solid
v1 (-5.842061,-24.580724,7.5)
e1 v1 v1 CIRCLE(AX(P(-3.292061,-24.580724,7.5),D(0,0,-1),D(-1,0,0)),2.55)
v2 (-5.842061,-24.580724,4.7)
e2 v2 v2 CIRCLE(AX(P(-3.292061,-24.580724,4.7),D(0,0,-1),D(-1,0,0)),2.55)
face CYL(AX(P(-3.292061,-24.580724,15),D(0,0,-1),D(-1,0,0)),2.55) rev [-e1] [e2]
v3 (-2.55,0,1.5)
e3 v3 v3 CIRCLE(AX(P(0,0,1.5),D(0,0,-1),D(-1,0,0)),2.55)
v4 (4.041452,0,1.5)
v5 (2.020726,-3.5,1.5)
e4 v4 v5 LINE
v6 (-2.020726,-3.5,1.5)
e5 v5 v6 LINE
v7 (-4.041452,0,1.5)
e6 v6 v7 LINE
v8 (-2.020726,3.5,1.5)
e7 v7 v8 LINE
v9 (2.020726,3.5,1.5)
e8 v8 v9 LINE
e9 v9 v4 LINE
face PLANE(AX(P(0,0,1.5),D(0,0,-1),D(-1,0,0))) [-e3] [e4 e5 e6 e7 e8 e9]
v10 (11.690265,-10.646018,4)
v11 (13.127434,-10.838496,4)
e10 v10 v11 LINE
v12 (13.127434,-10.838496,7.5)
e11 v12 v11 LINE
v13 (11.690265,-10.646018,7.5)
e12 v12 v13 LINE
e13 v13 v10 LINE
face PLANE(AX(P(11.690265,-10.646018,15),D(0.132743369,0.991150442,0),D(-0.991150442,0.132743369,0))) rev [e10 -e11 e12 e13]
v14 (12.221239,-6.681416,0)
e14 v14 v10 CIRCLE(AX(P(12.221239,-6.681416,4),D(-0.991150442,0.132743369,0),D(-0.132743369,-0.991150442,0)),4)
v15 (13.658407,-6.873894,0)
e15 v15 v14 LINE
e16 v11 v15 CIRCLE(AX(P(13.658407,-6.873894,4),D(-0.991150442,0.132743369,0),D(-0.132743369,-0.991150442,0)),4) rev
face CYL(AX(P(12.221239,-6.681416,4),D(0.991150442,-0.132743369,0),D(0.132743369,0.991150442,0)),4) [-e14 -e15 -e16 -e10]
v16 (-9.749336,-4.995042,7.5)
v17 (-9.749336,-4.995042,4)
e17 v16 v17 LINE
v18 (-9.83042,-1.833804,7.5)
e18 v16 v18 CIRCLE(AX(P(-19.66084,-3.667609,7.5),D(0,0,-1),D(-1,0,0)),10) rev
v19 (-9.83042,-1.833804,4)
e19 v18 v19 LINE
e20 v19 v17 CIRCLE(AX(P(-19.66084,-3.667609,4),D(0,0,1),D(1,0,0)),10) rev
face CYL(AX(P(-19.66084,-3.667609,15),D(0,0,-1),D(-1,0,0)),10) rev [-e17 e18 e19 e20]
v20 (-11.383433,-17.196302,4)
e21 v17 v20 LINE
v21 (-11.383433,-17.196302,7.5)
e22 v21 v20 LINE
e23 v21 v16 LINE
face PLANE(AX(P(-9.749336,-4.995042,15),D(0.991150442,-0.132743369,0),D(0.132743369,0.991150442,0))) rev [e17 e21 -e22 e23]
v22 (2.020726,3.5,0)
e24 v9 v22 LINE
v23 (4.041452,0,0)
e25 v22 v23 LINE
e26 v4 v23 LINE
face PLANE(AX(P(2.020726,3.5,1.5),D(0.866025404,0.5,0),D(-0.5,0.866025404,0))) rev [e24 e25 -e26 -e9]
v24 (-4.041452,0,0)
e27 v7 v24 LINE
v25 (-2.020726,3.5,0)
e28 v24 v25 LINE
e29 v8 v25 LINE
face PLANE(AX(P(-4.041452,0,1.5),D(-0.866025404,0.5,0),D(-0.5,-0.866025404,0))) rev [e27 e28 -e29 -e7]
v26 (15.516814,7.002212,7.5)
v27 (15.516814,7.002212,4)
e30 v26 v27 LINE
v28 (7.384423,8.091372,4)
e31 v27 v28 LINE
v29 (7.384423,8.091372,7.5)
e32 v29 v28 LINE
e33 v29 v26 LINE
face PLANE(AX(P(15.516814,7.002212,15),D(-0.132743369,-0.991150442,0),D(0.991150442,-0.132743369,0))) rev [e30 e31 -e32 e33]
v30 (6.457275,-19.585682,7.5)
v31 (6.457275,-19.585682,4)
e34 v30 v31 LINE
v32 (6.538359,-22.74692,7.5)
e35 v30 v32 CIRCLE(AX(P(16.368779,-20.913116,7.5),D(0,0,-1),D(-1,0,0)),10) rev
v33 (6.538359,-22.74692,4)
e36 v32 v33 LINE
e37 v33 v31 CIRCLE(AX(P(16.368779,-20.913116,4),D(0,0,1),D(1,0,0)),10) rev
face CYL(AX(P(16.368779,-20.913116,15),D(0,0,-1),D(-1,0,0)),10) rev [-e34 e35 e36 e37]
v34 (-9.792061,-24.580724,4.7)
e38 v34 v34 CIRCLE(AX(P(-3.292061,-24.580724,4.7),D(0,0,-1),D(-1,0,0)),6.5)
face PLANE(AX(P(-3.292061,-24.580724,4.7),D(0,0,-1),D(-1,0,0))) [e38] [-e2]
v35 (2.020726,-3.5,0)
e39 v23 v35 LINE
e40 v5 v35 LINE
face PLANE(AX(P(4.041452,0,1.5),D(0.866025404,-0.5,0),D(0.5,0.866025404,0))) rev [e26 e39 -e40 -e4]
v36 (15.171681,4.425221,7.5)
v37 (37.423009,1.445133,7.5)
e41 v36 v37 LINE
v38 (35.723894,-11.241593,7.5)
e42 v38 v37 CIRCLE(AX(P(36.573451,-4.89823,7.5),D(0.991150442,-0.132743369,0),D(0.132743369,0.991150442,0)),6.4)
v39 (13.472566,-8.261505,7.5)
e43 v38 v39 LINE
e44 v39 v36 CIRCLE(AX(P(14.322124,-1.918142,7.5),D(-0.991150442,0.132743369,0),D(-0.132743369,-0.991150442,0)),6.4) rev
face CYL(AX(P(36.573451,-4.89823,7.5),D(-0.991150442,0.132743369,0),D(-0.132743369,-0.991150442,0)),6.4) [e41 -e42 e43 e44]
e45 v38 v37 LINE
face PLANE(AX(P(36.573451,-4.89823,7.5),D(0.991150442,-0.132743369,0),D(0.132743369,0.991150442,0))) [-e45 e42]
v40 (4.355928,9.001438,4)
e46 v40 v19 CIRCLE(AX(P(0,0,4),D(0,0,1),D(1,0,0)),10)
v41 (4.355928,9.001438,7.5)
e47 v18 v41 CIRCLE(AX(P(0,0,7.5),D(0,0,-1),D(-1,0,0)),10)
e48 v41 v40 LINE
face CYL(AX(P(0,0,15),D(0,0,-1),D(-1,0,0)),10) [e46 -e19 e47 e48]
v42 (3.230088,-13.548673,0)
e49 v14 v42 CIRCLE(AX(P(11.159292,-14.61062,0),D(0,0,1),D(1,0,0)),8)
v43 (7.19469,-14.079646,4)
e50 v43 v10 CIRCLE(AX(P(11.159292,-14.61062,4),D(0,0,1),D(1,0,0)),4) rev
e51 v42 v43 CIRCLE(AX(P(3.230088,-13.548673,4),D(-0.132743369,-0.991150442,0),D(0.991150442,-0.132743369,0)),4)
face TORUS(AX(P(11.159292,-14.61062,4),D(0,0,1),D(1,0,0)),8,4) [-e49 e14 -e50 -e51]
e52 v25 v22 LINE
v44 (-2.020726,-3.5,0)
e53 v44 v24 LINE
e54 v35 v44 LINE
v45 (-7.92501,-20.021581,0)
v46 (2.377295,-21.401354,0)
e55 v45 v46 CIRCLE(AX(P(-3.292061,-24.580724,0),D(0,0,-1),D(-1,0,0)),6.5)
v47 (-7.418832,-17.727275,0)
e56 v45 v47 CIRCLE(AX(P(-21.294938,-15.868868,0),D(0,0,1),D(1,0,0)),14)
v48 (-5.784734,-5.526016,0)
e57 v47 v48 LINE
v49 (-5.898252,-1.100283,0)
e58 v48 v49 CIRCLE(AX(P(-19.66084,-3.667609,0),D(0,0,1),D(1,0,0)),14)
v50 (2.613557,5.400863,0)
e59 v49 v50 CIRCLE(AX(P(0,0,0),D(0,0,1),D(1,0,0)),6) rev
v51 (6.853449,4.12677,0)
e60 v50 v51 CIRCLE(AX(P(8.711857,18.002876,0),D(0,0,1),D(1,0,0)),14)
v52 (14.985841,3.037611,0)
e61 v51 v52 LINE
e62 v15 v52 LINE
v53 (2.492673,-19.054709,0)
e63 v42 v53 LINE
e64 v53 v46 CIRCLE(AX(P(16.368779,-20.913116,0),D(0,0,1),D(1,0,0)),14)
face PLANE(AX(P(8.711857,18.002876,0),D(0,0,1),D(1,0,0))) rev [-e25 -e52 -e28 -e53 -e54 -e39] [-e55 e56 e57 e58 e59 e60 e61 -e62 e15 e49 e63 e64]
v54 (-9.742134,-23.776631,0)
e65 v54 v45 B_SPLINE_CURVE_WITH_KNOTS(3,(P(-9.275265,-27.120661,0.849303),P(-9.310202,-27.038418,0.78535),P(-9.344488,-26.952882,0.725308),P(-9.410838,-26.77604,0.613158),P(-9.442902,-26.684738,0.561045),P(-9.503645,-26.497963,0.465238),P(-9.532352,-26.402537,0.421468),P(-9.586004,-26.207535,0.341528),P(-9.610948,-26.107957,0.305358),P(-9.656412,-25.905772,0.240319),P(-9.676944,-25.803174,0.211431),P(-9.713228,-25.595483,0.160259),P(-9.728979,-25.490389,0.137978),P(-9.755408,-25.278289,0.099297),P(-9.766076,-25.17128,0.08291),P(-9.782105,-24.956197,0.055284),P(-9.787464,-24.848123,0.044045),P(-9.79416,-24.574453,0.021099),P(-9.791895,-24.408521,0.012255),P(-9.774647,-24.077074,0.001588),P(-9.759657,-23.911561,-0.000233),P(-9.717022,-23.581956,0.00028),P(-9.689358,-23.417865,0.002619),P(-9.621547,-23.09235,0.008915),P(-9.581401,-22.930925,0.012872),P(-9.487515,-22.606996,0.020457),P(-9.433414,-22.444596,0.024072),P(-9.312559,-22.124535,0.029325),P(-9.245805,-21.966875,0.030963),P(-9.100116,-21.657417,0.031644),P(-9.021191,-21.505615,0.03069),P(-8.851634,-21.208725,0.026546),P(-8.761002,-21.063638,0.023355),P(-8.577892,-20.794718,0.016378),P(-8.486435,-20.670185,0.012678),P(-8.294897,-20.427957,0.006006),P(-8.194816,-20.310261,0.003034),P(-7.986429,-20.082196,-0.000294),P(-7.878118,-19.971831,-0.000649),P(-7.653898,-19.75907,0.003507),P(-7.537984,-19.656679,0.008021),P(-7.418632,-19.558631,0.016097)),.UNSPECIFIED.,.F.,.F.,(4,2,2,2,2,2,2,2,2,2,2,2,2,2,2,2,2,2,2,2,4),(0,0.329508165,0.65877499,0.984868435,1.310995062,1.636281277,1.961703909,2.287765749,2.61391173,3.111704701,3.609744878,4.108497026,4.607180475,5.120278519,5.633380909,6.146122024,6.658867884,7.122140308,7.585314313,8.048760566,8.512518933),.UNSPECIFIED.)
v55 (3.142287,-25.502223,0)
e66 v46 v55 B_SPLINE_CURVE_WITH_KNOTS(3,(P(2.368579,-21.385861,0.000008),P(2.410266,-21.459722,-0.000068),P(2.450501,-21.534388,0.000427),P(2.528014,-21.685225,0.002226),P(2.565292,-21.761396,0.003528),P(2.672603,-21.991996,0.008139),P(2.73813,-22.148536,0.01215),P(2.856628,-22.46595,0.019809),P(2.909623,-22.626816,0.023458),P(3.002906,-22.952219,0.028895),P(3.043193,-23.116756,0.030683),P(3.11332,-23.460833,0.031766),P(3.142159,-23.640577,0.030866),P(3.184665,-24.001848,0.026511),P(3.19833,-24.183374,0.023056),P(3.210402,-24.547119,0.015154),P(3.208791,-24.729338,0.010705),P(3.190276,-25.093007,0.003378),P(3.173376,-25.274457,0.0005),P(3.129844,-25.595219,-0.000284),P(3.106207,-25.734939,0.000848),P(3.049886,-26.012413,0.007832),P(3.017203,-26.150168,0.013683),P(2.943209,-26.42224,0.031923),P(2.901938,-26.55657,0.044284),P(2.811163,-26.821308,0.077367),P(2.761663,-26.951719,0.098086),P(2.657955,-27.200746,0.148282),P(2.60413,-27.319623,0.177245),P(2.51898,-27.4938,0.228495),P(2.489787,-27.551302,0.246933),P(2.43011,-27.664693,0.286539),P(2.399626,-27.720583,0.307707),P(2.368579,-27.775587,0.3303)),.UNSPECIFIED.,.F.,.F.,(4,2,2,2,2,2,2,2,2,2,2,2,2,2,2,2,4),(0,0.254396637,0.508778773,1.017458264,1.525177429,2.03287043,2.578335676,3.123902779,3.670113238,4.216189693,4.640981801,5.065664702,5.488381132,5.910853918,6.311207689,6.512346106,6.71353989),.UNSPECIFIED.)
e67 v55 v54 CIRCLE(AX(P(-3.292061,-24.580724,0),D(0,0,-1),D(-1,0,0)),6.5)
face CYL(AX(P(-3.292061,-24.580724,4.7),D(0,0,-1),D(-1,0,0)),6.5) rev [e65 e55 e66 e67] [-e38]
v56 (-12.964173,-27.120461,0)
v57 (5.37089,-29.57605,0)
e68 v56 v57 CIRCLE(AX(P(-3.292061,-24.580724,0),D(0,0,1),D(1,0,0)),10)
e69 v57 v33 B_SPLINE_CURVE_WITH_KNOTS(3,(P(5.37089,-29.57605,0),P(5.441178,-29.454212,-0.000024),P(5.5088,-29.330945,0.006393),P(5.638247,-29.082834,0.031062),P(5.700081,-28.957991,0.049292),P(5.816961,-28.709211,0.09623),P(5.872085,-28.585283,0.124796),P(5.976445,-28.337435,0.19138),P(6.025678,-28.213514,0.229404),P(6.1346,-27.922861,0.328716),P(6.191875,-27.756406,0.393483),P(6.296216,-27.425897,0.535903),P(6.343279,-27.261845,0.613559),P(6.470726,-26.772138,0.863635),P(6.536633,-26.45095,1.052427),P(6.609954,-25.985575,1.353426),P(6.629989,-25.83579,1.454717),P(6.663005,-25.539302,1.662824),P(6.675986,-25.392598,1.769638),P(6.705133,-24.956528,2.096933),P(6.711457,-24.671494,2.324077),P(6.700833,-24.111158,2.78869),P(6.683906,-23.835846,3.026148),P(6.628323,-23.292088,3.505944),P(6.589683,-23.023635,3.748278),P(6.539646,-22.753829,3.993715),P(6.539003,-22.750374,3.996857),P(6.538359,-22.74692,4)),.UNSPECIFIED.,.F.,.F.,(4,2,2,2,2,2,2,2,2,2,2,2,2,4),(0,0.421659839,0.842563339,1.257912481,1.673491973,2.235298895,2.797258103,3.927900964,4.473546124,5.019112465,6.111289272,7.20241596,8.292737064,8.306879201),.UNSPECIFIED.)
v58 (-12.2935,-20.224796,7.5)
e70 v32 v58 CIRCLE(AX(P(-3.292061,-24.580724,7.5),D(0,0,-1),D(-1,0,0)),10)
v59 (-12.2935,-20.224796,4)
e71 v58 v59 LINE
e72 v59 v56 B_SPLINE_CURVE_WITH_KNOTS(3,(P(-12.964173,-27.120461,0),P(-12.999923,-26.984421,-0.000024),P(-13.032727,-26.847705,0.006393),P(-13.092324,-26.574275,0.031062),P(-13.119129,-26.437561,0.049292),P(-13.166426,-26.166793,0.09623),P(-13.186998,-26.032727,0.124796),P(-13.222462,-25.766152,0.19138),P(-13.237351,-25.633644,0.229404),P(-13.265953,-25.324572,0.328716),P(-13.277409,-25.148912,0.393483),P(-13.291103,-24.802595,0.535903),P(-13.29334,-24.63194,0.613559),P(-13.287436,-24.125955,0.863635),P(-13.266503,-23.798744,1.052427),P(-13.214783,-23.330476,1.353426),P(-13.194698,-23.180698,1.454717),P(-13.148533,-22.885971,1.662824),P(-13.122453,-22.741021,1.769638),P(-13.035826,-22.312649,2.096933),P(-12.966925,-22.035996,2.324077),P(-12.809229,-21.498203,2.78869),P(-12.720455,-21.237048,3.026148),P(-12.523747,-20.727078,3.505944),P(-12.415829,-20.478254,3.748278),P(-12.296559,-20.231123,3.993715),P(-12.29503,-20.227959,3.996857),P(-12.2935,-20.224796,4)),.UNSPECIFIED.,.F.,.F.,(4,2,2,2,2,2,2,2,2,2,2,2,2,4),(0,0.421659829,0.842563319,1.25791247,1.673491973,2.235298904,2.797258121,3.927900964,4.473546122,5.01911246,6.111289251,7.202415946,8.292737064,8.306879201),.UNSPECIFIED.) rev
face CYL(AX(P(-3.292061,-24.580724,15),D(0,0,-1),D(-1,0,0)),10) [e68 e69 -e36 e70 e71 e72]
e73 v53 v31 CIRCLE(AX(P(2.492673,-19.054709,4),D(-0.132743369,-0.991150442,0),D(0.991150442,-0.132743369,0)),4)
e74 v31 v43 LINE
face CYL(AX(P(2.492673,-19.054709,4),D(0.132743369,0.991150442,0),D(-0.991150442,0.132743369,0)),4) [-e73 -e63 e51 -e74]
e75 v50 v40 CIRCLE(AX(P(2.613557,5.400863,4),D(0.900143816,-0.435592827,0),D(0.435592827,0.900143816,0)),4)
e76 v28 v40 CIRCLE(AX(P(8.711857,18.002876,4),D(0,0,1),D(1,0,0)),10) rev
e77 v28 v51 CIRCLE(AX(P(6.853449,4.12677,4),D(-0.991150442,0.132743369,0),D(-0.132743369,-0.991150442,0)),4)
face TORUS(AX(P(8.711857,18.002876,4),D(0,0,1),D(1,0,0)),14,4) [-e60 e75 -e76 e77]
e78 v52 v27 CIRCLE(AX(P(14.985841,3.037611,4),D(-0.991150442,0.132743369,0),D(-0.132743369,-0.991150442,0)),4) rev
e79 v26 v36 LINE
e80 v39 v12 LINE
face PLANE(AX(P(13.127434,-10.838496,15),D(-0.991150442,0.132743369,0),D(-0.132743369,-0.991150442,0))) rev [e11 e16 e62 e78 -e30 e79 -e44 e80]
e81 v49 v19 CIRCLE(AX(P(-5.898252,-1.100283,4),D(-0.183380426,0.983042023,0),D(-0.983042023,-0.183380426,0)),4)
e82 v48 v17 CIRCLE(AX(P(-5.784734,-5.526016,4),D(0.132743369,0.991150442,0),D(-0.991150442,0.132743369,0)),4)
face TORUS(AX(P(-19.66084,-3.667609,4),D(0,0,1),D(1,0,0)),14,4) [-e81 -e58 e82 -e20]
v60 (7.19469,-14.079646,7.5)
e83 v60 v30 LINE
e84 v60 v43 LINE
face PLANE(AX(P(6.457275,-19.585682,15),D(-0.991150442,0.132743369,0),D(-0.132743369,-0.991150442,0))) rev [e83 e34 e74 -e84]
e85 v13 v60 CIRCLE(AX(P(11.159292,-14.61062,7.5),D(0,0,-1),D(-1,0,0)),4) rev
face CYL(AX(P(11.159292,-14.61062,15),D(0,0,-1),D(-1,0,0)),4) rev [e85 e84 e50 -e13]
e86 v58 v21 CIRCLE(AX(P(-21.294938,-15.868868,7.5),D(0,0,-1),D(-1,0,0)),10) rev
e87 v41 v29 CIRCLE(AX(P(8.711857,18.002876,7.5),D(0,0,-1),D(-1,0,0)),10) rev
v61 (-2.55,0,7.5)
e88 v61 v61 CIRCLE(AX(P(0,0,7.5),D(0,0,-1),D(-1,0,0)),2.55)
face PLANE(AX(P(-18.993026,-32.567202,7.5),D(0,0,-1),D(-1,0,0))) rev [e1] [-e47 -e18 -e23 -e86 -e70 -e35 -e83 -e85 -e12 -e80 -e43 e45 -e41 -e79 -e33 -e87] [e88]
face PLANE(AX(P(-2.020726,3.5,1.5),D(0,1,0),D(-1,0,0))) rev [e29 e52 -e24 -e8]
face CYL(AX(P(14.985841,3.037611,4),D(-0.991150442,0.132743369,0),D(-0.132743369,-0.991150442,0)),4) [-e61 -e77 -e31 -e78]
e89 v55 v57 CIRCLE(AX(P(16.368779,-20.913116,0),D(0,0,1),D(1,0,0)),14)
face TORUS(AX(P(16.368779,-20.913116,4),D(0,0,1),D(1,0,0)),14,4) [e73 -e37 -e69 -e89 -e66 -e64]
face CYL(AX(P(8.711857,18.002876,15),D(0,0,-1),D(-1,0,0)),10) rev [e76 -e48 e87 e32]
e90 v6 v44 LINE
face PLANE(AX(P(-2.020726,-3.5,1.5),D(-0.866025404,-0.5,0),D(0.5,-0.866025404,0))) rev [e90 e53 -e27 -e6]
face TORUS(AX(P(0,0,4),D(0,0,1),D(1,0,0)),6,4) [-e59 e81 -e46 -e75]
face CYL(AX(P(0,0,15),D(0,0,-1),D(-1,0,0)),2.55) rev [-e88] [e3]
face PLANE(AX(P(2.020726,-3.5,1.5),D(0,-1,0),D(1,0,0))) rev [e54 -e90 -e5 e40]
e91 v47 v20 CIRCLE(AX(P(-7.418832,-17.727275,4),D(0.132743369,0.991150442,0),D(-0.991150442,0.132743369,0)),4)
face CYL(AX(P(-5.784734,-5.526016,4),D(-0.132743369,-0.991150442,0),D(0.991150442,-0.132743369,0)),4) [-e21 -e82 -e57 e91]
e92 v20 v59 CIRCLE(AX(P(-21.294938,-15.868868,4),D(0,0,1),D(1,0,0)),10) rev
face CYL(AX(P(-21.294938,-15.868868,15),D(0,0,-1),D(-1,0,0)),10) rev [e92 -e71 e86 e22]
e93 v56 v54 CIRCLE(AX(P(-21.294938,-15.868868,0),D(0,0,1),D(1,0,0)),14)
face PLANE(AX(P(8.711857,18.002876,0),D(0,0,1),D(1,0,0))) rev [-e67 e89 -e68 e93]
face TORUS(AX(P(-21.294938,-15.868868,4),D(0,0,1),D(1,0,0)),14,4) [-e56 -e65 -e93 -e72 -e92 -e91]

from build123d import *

# Parameters (mm, degrees)
SKETCH_5_R          = 2.549999999999386
SKETCH_5_R_2        = 2.5499999999993856
EXTRUDE_3_DEPTH     = 15
FILLET_4_R          = 4
SKETCH_6_R          = 6.4
EXTRUDE_4_DEPTH     = 22.45
SKETCH_7_R          = 6.500000000000399
CUT_EXTRUDE_1_DEPTH = 4.7
CUT_EXTRUDE_START   = -4.7
SKETCH_8_R          = 6.5000000000004
CUT_EXTRUDE_2_DEPTH = 4.7
SKETCH_9_W          = 7.500000000000001
SKETCH_9_H          = 50
CUT_EXTRUDE_3_DEPTH = 60.93846709540564
CUT_EXTRUDE_4_DEPTH = 1.5


with BuildPart() as part:
    # 草图5 → 凸台-拉伸3 (new body)
    with BuildSketch(Plane.XY):
        with BuildLine():
            Line((15.516814200942974, 7.002212297082977), (7.384422843001557, 8.091371903180063))
            ThreePointArc((7.384422843001557, 8.091371903180063), (5.833974336981676, 8.425935572547054), (4.355928265143314, 9.001438160032777))
            ThreePointArc((4.355928265143314, 9.001438160032777), (-6.069854623087594, 7.9471293467862205), (-9.830420232039064, -1.833804259316535))
            ThreePointArc((-9.830420232039064, -1.833804259316535), (-9.664128327097558, -3.411197812311804), (-9.749336047196284, -4.9950422059047135))
            Line((-9.749336047196284, -4.9950422059047135), (-11.383433357070604, -17.19630156804213))
            ThreePointArc((-11.383433357070604, -17.19630156804213), (-11.717997026437386, -18.74675007406113), (-12.293499613922735, -20.224796145898665))
            ThreePointArc((-12.293499613922735, -20.224796145898665), (-4.619495141172904, -34.49222882793015), (6.538358778190678, -22.74692015173956))
            ThreePointArc((6.538358778190678, -22.74692015173956), (6.372066873248224, -21.169526598736233), (6.457274593312704, -19.585682205136127))
            Line((6.457274593312704, -19.585682205136127), (7.194690181736359, -14.079646060494996))
            ThreePointArc((7.194690181736359, -14.079646060494996), (8.731350099253188, -11.431767796690654), (11.6902654233994, -10.646017768651808))
            Line((11.6902654233994, -10.646017768651808), (13.127433563848712, -10.83849565330608))
            Line((13.127433563848712, -10.83849565330608), (15.516814200942974, 7.002212297082977))
        make_face()
        Circle(SKETCH_5_R, mode=Mode.SUBTRACT)
        with Locations((-3.292061453885612, -24.580724411045196)):
            Circle(SKETCH_5_R_2, mode=Mode.SUBTRACT)
    extrude(amount=EXTRUDE_3_DEPTH)

    # 圆角4
    # the kernel refuses this fillet: 4 mm, written as the material it takes off along each edge
    with BuildSketch(Plane(origin=(-19.660840464079456, -3.667608518633336, 15), x_dir=(0.9830420232040514, 0.18338042593168238, 0), z_dir=(-0.18338042593168238, 0.9830420232040514, 0))) as fillet_4_piece_1:
        with BuildLine():
            CenterArc((9.999999999999877 + FILLET_4_R, FILLET_4_R), FILLET_4_R, 180, 90)
            Line((9.999999999999877 + FILLET_4_R, 0), (9.999999999999877, 0))
            Line((9.999999999999877, 0), (9.999999999999877, FILLET_4_R))
        make_face()
    revolve(axis=Axis((-19.660840464079456, -3.667608518633336, 15), (0, 0, -1)), revolution_arc=18.194872338749263, mode=Mode.SUBTRACT)
    with BuildSketch(Plane(origin=(25.428318617827628, 5.674778609821737, 0), x_dir=(0, 0, 1), z_dir=(-0.9911504416884656, 0.132743368726124, 0))) as fillet_4_piece_2:
        with BuildLine():
            CenterArc((FILLET_4_R, -FILLET_4_R), FILLET_4_R, 90, 90)
            Line((-4.4e-16, -FILLET_4_R), (0, 0))
            Line((0, 0), (FILLET_4_R, 0))
        make_face()
    extrude(amount=18.20500200160084, mode=Mode.SUBTRACT)
    with BuildSketch(Plane(origin=(11.6902654233994, -10.646017768651808, 0), x_dir=(0, 0, 1), z_dir=(0.9911504416883519, -0.13274336872697298, 0))) as fillet_4_piece_3:
        with BuildLine():
            CenterArc((FILLET_4_R, -FILLET_4_R), FILLET_4_R, 90, 90)
            Line((-4.4e-16, -FILLET_4_R), (0, 0))
            Line((0, 0), (FILLET_4_R, 0))
        make_face()
    extrude(amount=11.450000000001213, mode=Mode.SUBTRACT)
    with BuildSketch(Plane(origin=(11.159291948489525, -14.61061953540499, 0), x_dir=(-0.9911504416882816, 0.13274336872749704, 0), z_dir=(-0.13274336872749704, -0.9911504416882816, 0))) as fillet_4_piece_4:
        with BuildLine():
            CenterArc((4.00000000000004 + FILLET_4_R, -FILLET_4_R), FILLET_4_R, 90, 90)
            Line((4.00000000000004 + FILLET_4_R, 4.4e-16), (4.00000000000004, 0))
            Line((4.00000000000004, 0), (4.00000000000004, -FILLET_4_R))
        make_face()
    revolve(axis=Axis((11.159291948489525, -14.61061953540499, 0), (0, 0, -1)), revolution_arc=89.99999999999828, mode=Mode.SUBTRACT)
    with BuildSketch(Plane(origin=(6.457274593312704, -19.585682205136127, 0), x_dir=(0, 0, 1), z_dir=(0.13274336872730183, 0.9911504416883078, 0))) as fillet_4_piece_5:
        with BuildLine():
            CenterArc((FILLET_4_R, -FILLET_4_R), FILLET_4_R, 90, 90)
            Line((-4.4e-16, -FILLET_4_R), (0, 0))
            Line((0, 0), (FILLET_4_R, 0))
        make_face()
    extrude(amount=5.555197186072226, mode=Mode.SUBTRACT)
    with BuildSketch(Plane(origin=(16.3687790116358, -20.91311589226998, 0), x_dir=(-0.3768153606688204, -0.9262883913576953, 0), z_dir=(0.9262883913576953, -0.3768153606688204, 0))) as fillet_4_piece_6:
        with BuildLine():
            CenterArc((10.000000001408804 + FILLET_4_R, -FILLET_4_R), FILLET_4_R, 90, 90)
            Line((10.000000001408804 + FILLET_4_R, 4.4e-16), (10.000000001408804, 0))
            Line((10.000000001408804, 0), (10.000000001408807, -FILLET_4_R))
        make_face()
    revolve(axis=Axis((16.3687790116358, -20.91311589226998, 0), (0, 0, -1)), revolution_arc=75.49159227711695, mode=Mode.SUBTRACT)
    with BuildSketch(Plane(origin=(-9.749336047196284, -4.9950422059047135, 15), x_dir=(0, 0, -1), z_dir=(-0.13274336872713738, -0.9911504416883298, 0))) as fillet_4_piece_7:
        with BuildLine():
            CenterArc((FILLET_4_R, FILLET_4_R), FILLET_4_R, 180, 90)
            Line((0, FILLET_4_R), (0, 0))
            Line((0, 0), (FILLET_4_R, 0))
        make_face()
    extrude(amount=12.310199187677041, mode=Mode.SUBTRACT)
    with BuildSketch(Plane(origin=(-21.29493777395568, -15.868867880738112, 0), x_dir=(0.9911504416879034, -0.132743368730321, 0), z_dir=(0.132743368730321, 0.9911504416879034, 0))) as fillet_4_piece_8:
        with BuildLine():
            CenterArc((10.000000000006096 + FILLET_4_R, -FILLET_4_R), FILLET_4_R, 90, 90)
            Line((10.000000000006096 + FILLET_4_R, 4.4e-16), (10.000000000006096, 0))
            Line((10.000000000006096, 0), (10.000000000006095, -FILLET_4_R))
        make_face()
    revolve(axis=Axis((-21.29493777395568, -15.868867880738112, 0), (0, 0, -1)), revolution_arc=75.49159228762214, mode=Mode.SUBTRACT)
    with BuildSketch(Plane(origin=(-9.749336047196284, -4.9950422059047135, 0), x_dir=(0, 0, 1), z_dir=(-0.13274336872713738, -0.9911504416883298, 0))) as fillet_4_piece_9:
        with BuildLine():
            CenterArc((FILLET_4_R, -FILLET_4_R), FILLET_4_R, 90, 90)
            Line((-4.4e-16, -FILLET_4_R), (0, 0))
            Line((0, 0), (FILLET_4_R, 0))
        make_face()
    extrude(amount=12.310199187677041, mode=Mode.SUBTRACT)
    with BuildSketch(Plane(origin=(-19.660840464079456, -3.667608518633336, 0), x_dir=(0.9830420232040514, 0.18338042593168238, 0), z_dir=(-0.18338042593168238, 0.9830420232040514, 0))) as fillet_4_piece_10:
        with BuildLine():
            CenterArc((9.999999999999877 + FILLET_4_R, -FILLET_4_R), FILLET_4_R, 90, 90)
            Line((9.999999999999877 + FILLET_4_R, 4.4e-16), (9.999999999999877, 0))
            Line((9.999999999999877, 0), (9.999999999999877, -FILLET_4_R))
        make_face()
    revolve(axis=Axis((-19.660840464079456, -3.667608518633336, 0), (0, 0, -1)), revolution_arc=18.194872338749263, mode=Mode.SUBTRACT)
    with BuildSketch(Plane(origin=(1.293e-14, -9.637e-14, 0), x_dir=(0.43559282651439474, 0.900143816003421, 0), z_dir=(0.900143816003421, -0.43559282651439474, 0))) as fillet_4_piece_11:
        with BuildLine():
            CenterArc((9.999999999998517 - FILLET_4_R, FILLET_4_R), FILLET_4_R, 270, 90)
            Line((9.999999999998517 - FILLET_4_R, -4.4e-16), (9.999999999998517, 0))
            Line((9.999999999998517, 0), (9.999999999998517, FILLET_4_R))
        make_face()
    revolve(axis=Axis((1.293e-14, -9.637e-14, 0), (0, 0, 1)), revolution_arc=126.3897446775693, mode=Mode.SUBTRACT)
    with BuildSketch(Plane(origin=(8.711856530306191, 18.0028763200696, 0), x_dir=(-0.13274336873032264, -0.9911504416879031, 0), z_dir=(0.9911504416879031, -0.13274336873032264, 0))) as fillet_4_piece_12:
        with BuildLine():
            CenterArc((10.0000000000106 + FILLET_4_R, -FILLET_4_R), FILLET_4_R, 90.00000000000003, 90)
            Line((10.0000000000106 + FILLET_4_R, 4.4e-16), (10.0000000000106, 0))
            Line((10.0000000000106, 0), (10.0000000000106, -FILLET_4_R))
        make_face()
    revolve(axis=Axis((8.711856530306191, 18.0028763200696, 0), (0, 0, -1)), revolution_arc=18.19487233872778, mode=Mode.SUBTRACT)
    with BuildSketch(Plane(origin=(-21.29493777395568, -15.868867880738112, 15), x_dir=(0.9911504416879034, -0.132743368730321, 0), z_dir=(0.132743368730321, 0.9911504416879034, 0))) as fillet_4_piece_13:
        with BuildLine():
            CenterArc((10.000000000006096 + FILLET_4_R, FILLET_4_R), FILLET_4_R, 180, 90)
            Line((10.000000000006096 + FILLET_4_R, 0), (10.000000000006096, 0))
            Line((10.000000000006096, 0), (10.000000000006095, FILLET_4_R))
        make_face()
    revolve(axis=Axis((-21.29493777395568, -15.868867880738112, 15), (0, 0, -1)), revolution_arc=75.49159228762214, mode=Mode.SUBTRACT)
    with BuildSketch(Plane(origin=(16.3687790116358, -20.91311589226998, 15), x_dir=(-0.3768153606688204, -0.9262883913576953, 0), z_dir=(0.9262883913576953, -0.3768153606688204, 0))) as fillet_4_piece_14:
        with BuildLine():
            CenterArc((10.000000001408804 + FILLET_4_R, FILLET_4_R), FILLET_4_R, 180, 90)
            Line((10.000000001408804 + FILLET_4_R, 0), (10.000000001408804, 0))
            Line((10.000000001408804, 0), (10.000000001408807, FILLET_4_R))
        make_face()
    revolve(axis=Axis((16.3687790116358, -20.91311589226998, 15), (0, 0, -1)), revolution_arc=75.49159227711695, mode=Mode.SUBTRACT)
    with BuildSketch(Plane(origin=(6.457274593312704, -19.585682205136127, 15), x_dir=(0, 0, -1), z_dir=(0.13274336872730183, 0.9911504416883078, 0))) as fillet_4_piece_15:
        with BuildLine():
            CenterArc((FILLET_4_R, FILLET_4_R), FILLET_4_R, 180, 90)
            Line((0, FILLET_4_R), (0, 0))
            Line((0, 0), (FILLET_4_R, 0))
        make_face()
    extrude(amount=5.555197186072226, mode=Mode.SUBTRACT)
    with BuildSketch(Plane(origin=(11.159291948489525, -14.61061953540499, 15), x_dir=(-0.9911504416882816, 0.13274336872749704, 0), z_dir=(-0.13274336872749704, -0.9911504416882816, 0))) as fillet_4_piece_16:
        with BuildLine():
            CenterArc((4.00000000000004 + FILLET_4_R, FILLET_4_R), FILLET_4_R, 180, 90)
            Line((4.00000000000004 + FILLET_4_R, 0), (4.00000000000004, 0))
            Line((4.00000000000004, 0), (4.00000000000004, FILLET_4_R))
        make_face()
    revolve(axis=Axis((11.159291948489525, -14.61061953540499, 15), (0, 0, -1)), revolution_arc=89.99999999999828, mode=Mode.SUBTRACT)
    with BuildSketch(Plane(origin=(11.6902654233994, -10.646017768651808, 15), x_dir=(0, 0, -1), z_dir=(0.9911504416883519, -0.13274336872697298, 0))) as fillet_4_piece_17:
        with BuildLine():
            CenterArc((FILLET_4_R, FILLET_4_R), FILLET_4_R, 180, 90)
            Line((0, FILLET_4_R), (0, 0))
            Line((0, 0), (FILLET_4_R, 0))
        make_face()
    extrude(amount=11.450000000001213, mode=Mode.SUBTRACT)
    with BuildSketch(Plane(origin=(25.428318617827628, 5.674778609821737, 15), x_dir=(0, 0, -1), z_dir=(-0.9911504416884656, 0.132743368726124, 0))) as fillet_4_piece_18:
        with BuildLine():
            CenterArc((FILLET_4_R, FILLET_4_R), FILLET_4_R, 180, 90)
            Line((0, FILLET_4_R), (0, 0))
            Line((0, 0), (FILLET_4_R, 0))
        make_face()
    extrude(amount=18.20500200160084, mode=Mode.SUBTRACT)
    with BuildSketch(Plane(origin=(8.711856530306191, 18.0028763200696, 15), x_dir=(-0.13274336873032264, -0.9911504416879031, 0), z_dir=(0.9911504416879031, -0.13274336873032264, 0))) as fillet_4_piece_19:
        with BuildLine():
            CenterArc((10.0000000000106 + FILLET_4_R, FILLET_4_R), FILLET_4_R, 180, 90)
            Line((10.0000000000106 + FILLET_4_R, 0), (10.0000000000106, 0))
            Line((10.0000000000106, 0), (10.0000000000106, FILLET_4_R))
        make_face()
    revolve(axis=Axis((8.711856530306191, 18.0028763200696, 15), (0, 0, -1)), revolution_arc=18.19487233872778, mode=Mode.SUBTRACT)
    with BuildSketch(Plane(origin=(1.293e-14, -9.637e-14, 15), x_dir=(0.43559282651439474, 0.900143816003421, 0), z_dir=(0.900143816003421, -0.43559282651439474, 0))) as fillet_4_piece_20:
        with BuildLine():
            CenterArc((9.999999999998517 - FILLET_4_R, -FILLET_4_R), FILLET_4_R, 0, 90)
            Line((9.999999999998517 - FILLET_4_R, 0), (9.999999999998517, 0))
            Line((9.999999999998517, 0), (9.999999999998517, -FILLET_4_R))
        make_face()
    revolve(axis=Axis((1.293e-14, -9.637e-14, 15), (0, 0, 1)), revolution_arc=126.3897446775693, mode=Mode.SUBTRACT)

    # 草图6 → 凸台-拉伸4 (add)
    with BuildSketch(Plane(origin=(14.322123882395811, -1.918141678111804, 0), x_dir=(0, 0, -1), z_dir=(0.9911504416882867, -0.13274336872745984, 0))):
        with Locations(Location((-7.5, 2.047e-13, 0), (0, 0, 270))):
            Circle(SKETCH_6_R)
    extrude(amount=EXTRUDE_4_DEPTH)

    # 草图7 → 切除-拉伸1 (cut)
    with BuildSketch(Plane.XY.offset(15)):
        with Locations((-3.292061453885612, -24.580724411045196)):
            Circle(SKETCH_7_R)
    extrude(amount=-CUT_EXTRUDE_1_DEPTH, mode=Mode.SUBTRACT)

    # 草图8 → 切除-拉伸2 (cut)
    with BuildSketch(Plane(origin=(0, 0, 0), x_dir=(-1, 0, 0), z_dir=(0, 0, -1)).offset(CUT_EXTRUDE_START)):
        with Locations(Location((3.292061453885612, -24.580724411045196, 0), (0, 0, 180))):
            Circle(SKETCH_8_R)
    extrude(amount=CUT_EXTRUDE_2_DEPTH, mode=Mode.SUBTRACT)

    # 草图9 → 切除-拉伸3 (cut, through all)
    with BuildSketch(Plane(origin=(36.57345129829708, -4.898230306043175, 0), x_dir=(0, 0, -1), z_dir=(0.9911504416882867, -0.13274336872745987, 0))):
        with Locations((-11.250000000000002, -9.800195184490525)):
            Rectangle(SKETCH_9_W, SKETCH_9_H)
    extrude(amount=-CUT_EXTRUDE_3_DEPTH, mode=Mode.SUBTRACT)

    # 草图10 → 切除-拉伸4 (cut)
    with BuildSketch(Plane(origin=(0, 0, 0), x_dir=(-1, 0, 0), z_dir=(0, 0, -1))):
        Polygon((2.0207259421636907, -3.5), (4.041451884327381, 2.9e-16), (2.020725942163689, 3.5), (-2.0207259421636903, 3.4999999999999996), (-4.04145188432738, 0), (-2.020725942163687, -3.500000000000001), align=None)
    extrude(amount=-CUT_EXTRUDE_4_DEPTH, mode=Mode.SUBTRACT)


solid = part.part
